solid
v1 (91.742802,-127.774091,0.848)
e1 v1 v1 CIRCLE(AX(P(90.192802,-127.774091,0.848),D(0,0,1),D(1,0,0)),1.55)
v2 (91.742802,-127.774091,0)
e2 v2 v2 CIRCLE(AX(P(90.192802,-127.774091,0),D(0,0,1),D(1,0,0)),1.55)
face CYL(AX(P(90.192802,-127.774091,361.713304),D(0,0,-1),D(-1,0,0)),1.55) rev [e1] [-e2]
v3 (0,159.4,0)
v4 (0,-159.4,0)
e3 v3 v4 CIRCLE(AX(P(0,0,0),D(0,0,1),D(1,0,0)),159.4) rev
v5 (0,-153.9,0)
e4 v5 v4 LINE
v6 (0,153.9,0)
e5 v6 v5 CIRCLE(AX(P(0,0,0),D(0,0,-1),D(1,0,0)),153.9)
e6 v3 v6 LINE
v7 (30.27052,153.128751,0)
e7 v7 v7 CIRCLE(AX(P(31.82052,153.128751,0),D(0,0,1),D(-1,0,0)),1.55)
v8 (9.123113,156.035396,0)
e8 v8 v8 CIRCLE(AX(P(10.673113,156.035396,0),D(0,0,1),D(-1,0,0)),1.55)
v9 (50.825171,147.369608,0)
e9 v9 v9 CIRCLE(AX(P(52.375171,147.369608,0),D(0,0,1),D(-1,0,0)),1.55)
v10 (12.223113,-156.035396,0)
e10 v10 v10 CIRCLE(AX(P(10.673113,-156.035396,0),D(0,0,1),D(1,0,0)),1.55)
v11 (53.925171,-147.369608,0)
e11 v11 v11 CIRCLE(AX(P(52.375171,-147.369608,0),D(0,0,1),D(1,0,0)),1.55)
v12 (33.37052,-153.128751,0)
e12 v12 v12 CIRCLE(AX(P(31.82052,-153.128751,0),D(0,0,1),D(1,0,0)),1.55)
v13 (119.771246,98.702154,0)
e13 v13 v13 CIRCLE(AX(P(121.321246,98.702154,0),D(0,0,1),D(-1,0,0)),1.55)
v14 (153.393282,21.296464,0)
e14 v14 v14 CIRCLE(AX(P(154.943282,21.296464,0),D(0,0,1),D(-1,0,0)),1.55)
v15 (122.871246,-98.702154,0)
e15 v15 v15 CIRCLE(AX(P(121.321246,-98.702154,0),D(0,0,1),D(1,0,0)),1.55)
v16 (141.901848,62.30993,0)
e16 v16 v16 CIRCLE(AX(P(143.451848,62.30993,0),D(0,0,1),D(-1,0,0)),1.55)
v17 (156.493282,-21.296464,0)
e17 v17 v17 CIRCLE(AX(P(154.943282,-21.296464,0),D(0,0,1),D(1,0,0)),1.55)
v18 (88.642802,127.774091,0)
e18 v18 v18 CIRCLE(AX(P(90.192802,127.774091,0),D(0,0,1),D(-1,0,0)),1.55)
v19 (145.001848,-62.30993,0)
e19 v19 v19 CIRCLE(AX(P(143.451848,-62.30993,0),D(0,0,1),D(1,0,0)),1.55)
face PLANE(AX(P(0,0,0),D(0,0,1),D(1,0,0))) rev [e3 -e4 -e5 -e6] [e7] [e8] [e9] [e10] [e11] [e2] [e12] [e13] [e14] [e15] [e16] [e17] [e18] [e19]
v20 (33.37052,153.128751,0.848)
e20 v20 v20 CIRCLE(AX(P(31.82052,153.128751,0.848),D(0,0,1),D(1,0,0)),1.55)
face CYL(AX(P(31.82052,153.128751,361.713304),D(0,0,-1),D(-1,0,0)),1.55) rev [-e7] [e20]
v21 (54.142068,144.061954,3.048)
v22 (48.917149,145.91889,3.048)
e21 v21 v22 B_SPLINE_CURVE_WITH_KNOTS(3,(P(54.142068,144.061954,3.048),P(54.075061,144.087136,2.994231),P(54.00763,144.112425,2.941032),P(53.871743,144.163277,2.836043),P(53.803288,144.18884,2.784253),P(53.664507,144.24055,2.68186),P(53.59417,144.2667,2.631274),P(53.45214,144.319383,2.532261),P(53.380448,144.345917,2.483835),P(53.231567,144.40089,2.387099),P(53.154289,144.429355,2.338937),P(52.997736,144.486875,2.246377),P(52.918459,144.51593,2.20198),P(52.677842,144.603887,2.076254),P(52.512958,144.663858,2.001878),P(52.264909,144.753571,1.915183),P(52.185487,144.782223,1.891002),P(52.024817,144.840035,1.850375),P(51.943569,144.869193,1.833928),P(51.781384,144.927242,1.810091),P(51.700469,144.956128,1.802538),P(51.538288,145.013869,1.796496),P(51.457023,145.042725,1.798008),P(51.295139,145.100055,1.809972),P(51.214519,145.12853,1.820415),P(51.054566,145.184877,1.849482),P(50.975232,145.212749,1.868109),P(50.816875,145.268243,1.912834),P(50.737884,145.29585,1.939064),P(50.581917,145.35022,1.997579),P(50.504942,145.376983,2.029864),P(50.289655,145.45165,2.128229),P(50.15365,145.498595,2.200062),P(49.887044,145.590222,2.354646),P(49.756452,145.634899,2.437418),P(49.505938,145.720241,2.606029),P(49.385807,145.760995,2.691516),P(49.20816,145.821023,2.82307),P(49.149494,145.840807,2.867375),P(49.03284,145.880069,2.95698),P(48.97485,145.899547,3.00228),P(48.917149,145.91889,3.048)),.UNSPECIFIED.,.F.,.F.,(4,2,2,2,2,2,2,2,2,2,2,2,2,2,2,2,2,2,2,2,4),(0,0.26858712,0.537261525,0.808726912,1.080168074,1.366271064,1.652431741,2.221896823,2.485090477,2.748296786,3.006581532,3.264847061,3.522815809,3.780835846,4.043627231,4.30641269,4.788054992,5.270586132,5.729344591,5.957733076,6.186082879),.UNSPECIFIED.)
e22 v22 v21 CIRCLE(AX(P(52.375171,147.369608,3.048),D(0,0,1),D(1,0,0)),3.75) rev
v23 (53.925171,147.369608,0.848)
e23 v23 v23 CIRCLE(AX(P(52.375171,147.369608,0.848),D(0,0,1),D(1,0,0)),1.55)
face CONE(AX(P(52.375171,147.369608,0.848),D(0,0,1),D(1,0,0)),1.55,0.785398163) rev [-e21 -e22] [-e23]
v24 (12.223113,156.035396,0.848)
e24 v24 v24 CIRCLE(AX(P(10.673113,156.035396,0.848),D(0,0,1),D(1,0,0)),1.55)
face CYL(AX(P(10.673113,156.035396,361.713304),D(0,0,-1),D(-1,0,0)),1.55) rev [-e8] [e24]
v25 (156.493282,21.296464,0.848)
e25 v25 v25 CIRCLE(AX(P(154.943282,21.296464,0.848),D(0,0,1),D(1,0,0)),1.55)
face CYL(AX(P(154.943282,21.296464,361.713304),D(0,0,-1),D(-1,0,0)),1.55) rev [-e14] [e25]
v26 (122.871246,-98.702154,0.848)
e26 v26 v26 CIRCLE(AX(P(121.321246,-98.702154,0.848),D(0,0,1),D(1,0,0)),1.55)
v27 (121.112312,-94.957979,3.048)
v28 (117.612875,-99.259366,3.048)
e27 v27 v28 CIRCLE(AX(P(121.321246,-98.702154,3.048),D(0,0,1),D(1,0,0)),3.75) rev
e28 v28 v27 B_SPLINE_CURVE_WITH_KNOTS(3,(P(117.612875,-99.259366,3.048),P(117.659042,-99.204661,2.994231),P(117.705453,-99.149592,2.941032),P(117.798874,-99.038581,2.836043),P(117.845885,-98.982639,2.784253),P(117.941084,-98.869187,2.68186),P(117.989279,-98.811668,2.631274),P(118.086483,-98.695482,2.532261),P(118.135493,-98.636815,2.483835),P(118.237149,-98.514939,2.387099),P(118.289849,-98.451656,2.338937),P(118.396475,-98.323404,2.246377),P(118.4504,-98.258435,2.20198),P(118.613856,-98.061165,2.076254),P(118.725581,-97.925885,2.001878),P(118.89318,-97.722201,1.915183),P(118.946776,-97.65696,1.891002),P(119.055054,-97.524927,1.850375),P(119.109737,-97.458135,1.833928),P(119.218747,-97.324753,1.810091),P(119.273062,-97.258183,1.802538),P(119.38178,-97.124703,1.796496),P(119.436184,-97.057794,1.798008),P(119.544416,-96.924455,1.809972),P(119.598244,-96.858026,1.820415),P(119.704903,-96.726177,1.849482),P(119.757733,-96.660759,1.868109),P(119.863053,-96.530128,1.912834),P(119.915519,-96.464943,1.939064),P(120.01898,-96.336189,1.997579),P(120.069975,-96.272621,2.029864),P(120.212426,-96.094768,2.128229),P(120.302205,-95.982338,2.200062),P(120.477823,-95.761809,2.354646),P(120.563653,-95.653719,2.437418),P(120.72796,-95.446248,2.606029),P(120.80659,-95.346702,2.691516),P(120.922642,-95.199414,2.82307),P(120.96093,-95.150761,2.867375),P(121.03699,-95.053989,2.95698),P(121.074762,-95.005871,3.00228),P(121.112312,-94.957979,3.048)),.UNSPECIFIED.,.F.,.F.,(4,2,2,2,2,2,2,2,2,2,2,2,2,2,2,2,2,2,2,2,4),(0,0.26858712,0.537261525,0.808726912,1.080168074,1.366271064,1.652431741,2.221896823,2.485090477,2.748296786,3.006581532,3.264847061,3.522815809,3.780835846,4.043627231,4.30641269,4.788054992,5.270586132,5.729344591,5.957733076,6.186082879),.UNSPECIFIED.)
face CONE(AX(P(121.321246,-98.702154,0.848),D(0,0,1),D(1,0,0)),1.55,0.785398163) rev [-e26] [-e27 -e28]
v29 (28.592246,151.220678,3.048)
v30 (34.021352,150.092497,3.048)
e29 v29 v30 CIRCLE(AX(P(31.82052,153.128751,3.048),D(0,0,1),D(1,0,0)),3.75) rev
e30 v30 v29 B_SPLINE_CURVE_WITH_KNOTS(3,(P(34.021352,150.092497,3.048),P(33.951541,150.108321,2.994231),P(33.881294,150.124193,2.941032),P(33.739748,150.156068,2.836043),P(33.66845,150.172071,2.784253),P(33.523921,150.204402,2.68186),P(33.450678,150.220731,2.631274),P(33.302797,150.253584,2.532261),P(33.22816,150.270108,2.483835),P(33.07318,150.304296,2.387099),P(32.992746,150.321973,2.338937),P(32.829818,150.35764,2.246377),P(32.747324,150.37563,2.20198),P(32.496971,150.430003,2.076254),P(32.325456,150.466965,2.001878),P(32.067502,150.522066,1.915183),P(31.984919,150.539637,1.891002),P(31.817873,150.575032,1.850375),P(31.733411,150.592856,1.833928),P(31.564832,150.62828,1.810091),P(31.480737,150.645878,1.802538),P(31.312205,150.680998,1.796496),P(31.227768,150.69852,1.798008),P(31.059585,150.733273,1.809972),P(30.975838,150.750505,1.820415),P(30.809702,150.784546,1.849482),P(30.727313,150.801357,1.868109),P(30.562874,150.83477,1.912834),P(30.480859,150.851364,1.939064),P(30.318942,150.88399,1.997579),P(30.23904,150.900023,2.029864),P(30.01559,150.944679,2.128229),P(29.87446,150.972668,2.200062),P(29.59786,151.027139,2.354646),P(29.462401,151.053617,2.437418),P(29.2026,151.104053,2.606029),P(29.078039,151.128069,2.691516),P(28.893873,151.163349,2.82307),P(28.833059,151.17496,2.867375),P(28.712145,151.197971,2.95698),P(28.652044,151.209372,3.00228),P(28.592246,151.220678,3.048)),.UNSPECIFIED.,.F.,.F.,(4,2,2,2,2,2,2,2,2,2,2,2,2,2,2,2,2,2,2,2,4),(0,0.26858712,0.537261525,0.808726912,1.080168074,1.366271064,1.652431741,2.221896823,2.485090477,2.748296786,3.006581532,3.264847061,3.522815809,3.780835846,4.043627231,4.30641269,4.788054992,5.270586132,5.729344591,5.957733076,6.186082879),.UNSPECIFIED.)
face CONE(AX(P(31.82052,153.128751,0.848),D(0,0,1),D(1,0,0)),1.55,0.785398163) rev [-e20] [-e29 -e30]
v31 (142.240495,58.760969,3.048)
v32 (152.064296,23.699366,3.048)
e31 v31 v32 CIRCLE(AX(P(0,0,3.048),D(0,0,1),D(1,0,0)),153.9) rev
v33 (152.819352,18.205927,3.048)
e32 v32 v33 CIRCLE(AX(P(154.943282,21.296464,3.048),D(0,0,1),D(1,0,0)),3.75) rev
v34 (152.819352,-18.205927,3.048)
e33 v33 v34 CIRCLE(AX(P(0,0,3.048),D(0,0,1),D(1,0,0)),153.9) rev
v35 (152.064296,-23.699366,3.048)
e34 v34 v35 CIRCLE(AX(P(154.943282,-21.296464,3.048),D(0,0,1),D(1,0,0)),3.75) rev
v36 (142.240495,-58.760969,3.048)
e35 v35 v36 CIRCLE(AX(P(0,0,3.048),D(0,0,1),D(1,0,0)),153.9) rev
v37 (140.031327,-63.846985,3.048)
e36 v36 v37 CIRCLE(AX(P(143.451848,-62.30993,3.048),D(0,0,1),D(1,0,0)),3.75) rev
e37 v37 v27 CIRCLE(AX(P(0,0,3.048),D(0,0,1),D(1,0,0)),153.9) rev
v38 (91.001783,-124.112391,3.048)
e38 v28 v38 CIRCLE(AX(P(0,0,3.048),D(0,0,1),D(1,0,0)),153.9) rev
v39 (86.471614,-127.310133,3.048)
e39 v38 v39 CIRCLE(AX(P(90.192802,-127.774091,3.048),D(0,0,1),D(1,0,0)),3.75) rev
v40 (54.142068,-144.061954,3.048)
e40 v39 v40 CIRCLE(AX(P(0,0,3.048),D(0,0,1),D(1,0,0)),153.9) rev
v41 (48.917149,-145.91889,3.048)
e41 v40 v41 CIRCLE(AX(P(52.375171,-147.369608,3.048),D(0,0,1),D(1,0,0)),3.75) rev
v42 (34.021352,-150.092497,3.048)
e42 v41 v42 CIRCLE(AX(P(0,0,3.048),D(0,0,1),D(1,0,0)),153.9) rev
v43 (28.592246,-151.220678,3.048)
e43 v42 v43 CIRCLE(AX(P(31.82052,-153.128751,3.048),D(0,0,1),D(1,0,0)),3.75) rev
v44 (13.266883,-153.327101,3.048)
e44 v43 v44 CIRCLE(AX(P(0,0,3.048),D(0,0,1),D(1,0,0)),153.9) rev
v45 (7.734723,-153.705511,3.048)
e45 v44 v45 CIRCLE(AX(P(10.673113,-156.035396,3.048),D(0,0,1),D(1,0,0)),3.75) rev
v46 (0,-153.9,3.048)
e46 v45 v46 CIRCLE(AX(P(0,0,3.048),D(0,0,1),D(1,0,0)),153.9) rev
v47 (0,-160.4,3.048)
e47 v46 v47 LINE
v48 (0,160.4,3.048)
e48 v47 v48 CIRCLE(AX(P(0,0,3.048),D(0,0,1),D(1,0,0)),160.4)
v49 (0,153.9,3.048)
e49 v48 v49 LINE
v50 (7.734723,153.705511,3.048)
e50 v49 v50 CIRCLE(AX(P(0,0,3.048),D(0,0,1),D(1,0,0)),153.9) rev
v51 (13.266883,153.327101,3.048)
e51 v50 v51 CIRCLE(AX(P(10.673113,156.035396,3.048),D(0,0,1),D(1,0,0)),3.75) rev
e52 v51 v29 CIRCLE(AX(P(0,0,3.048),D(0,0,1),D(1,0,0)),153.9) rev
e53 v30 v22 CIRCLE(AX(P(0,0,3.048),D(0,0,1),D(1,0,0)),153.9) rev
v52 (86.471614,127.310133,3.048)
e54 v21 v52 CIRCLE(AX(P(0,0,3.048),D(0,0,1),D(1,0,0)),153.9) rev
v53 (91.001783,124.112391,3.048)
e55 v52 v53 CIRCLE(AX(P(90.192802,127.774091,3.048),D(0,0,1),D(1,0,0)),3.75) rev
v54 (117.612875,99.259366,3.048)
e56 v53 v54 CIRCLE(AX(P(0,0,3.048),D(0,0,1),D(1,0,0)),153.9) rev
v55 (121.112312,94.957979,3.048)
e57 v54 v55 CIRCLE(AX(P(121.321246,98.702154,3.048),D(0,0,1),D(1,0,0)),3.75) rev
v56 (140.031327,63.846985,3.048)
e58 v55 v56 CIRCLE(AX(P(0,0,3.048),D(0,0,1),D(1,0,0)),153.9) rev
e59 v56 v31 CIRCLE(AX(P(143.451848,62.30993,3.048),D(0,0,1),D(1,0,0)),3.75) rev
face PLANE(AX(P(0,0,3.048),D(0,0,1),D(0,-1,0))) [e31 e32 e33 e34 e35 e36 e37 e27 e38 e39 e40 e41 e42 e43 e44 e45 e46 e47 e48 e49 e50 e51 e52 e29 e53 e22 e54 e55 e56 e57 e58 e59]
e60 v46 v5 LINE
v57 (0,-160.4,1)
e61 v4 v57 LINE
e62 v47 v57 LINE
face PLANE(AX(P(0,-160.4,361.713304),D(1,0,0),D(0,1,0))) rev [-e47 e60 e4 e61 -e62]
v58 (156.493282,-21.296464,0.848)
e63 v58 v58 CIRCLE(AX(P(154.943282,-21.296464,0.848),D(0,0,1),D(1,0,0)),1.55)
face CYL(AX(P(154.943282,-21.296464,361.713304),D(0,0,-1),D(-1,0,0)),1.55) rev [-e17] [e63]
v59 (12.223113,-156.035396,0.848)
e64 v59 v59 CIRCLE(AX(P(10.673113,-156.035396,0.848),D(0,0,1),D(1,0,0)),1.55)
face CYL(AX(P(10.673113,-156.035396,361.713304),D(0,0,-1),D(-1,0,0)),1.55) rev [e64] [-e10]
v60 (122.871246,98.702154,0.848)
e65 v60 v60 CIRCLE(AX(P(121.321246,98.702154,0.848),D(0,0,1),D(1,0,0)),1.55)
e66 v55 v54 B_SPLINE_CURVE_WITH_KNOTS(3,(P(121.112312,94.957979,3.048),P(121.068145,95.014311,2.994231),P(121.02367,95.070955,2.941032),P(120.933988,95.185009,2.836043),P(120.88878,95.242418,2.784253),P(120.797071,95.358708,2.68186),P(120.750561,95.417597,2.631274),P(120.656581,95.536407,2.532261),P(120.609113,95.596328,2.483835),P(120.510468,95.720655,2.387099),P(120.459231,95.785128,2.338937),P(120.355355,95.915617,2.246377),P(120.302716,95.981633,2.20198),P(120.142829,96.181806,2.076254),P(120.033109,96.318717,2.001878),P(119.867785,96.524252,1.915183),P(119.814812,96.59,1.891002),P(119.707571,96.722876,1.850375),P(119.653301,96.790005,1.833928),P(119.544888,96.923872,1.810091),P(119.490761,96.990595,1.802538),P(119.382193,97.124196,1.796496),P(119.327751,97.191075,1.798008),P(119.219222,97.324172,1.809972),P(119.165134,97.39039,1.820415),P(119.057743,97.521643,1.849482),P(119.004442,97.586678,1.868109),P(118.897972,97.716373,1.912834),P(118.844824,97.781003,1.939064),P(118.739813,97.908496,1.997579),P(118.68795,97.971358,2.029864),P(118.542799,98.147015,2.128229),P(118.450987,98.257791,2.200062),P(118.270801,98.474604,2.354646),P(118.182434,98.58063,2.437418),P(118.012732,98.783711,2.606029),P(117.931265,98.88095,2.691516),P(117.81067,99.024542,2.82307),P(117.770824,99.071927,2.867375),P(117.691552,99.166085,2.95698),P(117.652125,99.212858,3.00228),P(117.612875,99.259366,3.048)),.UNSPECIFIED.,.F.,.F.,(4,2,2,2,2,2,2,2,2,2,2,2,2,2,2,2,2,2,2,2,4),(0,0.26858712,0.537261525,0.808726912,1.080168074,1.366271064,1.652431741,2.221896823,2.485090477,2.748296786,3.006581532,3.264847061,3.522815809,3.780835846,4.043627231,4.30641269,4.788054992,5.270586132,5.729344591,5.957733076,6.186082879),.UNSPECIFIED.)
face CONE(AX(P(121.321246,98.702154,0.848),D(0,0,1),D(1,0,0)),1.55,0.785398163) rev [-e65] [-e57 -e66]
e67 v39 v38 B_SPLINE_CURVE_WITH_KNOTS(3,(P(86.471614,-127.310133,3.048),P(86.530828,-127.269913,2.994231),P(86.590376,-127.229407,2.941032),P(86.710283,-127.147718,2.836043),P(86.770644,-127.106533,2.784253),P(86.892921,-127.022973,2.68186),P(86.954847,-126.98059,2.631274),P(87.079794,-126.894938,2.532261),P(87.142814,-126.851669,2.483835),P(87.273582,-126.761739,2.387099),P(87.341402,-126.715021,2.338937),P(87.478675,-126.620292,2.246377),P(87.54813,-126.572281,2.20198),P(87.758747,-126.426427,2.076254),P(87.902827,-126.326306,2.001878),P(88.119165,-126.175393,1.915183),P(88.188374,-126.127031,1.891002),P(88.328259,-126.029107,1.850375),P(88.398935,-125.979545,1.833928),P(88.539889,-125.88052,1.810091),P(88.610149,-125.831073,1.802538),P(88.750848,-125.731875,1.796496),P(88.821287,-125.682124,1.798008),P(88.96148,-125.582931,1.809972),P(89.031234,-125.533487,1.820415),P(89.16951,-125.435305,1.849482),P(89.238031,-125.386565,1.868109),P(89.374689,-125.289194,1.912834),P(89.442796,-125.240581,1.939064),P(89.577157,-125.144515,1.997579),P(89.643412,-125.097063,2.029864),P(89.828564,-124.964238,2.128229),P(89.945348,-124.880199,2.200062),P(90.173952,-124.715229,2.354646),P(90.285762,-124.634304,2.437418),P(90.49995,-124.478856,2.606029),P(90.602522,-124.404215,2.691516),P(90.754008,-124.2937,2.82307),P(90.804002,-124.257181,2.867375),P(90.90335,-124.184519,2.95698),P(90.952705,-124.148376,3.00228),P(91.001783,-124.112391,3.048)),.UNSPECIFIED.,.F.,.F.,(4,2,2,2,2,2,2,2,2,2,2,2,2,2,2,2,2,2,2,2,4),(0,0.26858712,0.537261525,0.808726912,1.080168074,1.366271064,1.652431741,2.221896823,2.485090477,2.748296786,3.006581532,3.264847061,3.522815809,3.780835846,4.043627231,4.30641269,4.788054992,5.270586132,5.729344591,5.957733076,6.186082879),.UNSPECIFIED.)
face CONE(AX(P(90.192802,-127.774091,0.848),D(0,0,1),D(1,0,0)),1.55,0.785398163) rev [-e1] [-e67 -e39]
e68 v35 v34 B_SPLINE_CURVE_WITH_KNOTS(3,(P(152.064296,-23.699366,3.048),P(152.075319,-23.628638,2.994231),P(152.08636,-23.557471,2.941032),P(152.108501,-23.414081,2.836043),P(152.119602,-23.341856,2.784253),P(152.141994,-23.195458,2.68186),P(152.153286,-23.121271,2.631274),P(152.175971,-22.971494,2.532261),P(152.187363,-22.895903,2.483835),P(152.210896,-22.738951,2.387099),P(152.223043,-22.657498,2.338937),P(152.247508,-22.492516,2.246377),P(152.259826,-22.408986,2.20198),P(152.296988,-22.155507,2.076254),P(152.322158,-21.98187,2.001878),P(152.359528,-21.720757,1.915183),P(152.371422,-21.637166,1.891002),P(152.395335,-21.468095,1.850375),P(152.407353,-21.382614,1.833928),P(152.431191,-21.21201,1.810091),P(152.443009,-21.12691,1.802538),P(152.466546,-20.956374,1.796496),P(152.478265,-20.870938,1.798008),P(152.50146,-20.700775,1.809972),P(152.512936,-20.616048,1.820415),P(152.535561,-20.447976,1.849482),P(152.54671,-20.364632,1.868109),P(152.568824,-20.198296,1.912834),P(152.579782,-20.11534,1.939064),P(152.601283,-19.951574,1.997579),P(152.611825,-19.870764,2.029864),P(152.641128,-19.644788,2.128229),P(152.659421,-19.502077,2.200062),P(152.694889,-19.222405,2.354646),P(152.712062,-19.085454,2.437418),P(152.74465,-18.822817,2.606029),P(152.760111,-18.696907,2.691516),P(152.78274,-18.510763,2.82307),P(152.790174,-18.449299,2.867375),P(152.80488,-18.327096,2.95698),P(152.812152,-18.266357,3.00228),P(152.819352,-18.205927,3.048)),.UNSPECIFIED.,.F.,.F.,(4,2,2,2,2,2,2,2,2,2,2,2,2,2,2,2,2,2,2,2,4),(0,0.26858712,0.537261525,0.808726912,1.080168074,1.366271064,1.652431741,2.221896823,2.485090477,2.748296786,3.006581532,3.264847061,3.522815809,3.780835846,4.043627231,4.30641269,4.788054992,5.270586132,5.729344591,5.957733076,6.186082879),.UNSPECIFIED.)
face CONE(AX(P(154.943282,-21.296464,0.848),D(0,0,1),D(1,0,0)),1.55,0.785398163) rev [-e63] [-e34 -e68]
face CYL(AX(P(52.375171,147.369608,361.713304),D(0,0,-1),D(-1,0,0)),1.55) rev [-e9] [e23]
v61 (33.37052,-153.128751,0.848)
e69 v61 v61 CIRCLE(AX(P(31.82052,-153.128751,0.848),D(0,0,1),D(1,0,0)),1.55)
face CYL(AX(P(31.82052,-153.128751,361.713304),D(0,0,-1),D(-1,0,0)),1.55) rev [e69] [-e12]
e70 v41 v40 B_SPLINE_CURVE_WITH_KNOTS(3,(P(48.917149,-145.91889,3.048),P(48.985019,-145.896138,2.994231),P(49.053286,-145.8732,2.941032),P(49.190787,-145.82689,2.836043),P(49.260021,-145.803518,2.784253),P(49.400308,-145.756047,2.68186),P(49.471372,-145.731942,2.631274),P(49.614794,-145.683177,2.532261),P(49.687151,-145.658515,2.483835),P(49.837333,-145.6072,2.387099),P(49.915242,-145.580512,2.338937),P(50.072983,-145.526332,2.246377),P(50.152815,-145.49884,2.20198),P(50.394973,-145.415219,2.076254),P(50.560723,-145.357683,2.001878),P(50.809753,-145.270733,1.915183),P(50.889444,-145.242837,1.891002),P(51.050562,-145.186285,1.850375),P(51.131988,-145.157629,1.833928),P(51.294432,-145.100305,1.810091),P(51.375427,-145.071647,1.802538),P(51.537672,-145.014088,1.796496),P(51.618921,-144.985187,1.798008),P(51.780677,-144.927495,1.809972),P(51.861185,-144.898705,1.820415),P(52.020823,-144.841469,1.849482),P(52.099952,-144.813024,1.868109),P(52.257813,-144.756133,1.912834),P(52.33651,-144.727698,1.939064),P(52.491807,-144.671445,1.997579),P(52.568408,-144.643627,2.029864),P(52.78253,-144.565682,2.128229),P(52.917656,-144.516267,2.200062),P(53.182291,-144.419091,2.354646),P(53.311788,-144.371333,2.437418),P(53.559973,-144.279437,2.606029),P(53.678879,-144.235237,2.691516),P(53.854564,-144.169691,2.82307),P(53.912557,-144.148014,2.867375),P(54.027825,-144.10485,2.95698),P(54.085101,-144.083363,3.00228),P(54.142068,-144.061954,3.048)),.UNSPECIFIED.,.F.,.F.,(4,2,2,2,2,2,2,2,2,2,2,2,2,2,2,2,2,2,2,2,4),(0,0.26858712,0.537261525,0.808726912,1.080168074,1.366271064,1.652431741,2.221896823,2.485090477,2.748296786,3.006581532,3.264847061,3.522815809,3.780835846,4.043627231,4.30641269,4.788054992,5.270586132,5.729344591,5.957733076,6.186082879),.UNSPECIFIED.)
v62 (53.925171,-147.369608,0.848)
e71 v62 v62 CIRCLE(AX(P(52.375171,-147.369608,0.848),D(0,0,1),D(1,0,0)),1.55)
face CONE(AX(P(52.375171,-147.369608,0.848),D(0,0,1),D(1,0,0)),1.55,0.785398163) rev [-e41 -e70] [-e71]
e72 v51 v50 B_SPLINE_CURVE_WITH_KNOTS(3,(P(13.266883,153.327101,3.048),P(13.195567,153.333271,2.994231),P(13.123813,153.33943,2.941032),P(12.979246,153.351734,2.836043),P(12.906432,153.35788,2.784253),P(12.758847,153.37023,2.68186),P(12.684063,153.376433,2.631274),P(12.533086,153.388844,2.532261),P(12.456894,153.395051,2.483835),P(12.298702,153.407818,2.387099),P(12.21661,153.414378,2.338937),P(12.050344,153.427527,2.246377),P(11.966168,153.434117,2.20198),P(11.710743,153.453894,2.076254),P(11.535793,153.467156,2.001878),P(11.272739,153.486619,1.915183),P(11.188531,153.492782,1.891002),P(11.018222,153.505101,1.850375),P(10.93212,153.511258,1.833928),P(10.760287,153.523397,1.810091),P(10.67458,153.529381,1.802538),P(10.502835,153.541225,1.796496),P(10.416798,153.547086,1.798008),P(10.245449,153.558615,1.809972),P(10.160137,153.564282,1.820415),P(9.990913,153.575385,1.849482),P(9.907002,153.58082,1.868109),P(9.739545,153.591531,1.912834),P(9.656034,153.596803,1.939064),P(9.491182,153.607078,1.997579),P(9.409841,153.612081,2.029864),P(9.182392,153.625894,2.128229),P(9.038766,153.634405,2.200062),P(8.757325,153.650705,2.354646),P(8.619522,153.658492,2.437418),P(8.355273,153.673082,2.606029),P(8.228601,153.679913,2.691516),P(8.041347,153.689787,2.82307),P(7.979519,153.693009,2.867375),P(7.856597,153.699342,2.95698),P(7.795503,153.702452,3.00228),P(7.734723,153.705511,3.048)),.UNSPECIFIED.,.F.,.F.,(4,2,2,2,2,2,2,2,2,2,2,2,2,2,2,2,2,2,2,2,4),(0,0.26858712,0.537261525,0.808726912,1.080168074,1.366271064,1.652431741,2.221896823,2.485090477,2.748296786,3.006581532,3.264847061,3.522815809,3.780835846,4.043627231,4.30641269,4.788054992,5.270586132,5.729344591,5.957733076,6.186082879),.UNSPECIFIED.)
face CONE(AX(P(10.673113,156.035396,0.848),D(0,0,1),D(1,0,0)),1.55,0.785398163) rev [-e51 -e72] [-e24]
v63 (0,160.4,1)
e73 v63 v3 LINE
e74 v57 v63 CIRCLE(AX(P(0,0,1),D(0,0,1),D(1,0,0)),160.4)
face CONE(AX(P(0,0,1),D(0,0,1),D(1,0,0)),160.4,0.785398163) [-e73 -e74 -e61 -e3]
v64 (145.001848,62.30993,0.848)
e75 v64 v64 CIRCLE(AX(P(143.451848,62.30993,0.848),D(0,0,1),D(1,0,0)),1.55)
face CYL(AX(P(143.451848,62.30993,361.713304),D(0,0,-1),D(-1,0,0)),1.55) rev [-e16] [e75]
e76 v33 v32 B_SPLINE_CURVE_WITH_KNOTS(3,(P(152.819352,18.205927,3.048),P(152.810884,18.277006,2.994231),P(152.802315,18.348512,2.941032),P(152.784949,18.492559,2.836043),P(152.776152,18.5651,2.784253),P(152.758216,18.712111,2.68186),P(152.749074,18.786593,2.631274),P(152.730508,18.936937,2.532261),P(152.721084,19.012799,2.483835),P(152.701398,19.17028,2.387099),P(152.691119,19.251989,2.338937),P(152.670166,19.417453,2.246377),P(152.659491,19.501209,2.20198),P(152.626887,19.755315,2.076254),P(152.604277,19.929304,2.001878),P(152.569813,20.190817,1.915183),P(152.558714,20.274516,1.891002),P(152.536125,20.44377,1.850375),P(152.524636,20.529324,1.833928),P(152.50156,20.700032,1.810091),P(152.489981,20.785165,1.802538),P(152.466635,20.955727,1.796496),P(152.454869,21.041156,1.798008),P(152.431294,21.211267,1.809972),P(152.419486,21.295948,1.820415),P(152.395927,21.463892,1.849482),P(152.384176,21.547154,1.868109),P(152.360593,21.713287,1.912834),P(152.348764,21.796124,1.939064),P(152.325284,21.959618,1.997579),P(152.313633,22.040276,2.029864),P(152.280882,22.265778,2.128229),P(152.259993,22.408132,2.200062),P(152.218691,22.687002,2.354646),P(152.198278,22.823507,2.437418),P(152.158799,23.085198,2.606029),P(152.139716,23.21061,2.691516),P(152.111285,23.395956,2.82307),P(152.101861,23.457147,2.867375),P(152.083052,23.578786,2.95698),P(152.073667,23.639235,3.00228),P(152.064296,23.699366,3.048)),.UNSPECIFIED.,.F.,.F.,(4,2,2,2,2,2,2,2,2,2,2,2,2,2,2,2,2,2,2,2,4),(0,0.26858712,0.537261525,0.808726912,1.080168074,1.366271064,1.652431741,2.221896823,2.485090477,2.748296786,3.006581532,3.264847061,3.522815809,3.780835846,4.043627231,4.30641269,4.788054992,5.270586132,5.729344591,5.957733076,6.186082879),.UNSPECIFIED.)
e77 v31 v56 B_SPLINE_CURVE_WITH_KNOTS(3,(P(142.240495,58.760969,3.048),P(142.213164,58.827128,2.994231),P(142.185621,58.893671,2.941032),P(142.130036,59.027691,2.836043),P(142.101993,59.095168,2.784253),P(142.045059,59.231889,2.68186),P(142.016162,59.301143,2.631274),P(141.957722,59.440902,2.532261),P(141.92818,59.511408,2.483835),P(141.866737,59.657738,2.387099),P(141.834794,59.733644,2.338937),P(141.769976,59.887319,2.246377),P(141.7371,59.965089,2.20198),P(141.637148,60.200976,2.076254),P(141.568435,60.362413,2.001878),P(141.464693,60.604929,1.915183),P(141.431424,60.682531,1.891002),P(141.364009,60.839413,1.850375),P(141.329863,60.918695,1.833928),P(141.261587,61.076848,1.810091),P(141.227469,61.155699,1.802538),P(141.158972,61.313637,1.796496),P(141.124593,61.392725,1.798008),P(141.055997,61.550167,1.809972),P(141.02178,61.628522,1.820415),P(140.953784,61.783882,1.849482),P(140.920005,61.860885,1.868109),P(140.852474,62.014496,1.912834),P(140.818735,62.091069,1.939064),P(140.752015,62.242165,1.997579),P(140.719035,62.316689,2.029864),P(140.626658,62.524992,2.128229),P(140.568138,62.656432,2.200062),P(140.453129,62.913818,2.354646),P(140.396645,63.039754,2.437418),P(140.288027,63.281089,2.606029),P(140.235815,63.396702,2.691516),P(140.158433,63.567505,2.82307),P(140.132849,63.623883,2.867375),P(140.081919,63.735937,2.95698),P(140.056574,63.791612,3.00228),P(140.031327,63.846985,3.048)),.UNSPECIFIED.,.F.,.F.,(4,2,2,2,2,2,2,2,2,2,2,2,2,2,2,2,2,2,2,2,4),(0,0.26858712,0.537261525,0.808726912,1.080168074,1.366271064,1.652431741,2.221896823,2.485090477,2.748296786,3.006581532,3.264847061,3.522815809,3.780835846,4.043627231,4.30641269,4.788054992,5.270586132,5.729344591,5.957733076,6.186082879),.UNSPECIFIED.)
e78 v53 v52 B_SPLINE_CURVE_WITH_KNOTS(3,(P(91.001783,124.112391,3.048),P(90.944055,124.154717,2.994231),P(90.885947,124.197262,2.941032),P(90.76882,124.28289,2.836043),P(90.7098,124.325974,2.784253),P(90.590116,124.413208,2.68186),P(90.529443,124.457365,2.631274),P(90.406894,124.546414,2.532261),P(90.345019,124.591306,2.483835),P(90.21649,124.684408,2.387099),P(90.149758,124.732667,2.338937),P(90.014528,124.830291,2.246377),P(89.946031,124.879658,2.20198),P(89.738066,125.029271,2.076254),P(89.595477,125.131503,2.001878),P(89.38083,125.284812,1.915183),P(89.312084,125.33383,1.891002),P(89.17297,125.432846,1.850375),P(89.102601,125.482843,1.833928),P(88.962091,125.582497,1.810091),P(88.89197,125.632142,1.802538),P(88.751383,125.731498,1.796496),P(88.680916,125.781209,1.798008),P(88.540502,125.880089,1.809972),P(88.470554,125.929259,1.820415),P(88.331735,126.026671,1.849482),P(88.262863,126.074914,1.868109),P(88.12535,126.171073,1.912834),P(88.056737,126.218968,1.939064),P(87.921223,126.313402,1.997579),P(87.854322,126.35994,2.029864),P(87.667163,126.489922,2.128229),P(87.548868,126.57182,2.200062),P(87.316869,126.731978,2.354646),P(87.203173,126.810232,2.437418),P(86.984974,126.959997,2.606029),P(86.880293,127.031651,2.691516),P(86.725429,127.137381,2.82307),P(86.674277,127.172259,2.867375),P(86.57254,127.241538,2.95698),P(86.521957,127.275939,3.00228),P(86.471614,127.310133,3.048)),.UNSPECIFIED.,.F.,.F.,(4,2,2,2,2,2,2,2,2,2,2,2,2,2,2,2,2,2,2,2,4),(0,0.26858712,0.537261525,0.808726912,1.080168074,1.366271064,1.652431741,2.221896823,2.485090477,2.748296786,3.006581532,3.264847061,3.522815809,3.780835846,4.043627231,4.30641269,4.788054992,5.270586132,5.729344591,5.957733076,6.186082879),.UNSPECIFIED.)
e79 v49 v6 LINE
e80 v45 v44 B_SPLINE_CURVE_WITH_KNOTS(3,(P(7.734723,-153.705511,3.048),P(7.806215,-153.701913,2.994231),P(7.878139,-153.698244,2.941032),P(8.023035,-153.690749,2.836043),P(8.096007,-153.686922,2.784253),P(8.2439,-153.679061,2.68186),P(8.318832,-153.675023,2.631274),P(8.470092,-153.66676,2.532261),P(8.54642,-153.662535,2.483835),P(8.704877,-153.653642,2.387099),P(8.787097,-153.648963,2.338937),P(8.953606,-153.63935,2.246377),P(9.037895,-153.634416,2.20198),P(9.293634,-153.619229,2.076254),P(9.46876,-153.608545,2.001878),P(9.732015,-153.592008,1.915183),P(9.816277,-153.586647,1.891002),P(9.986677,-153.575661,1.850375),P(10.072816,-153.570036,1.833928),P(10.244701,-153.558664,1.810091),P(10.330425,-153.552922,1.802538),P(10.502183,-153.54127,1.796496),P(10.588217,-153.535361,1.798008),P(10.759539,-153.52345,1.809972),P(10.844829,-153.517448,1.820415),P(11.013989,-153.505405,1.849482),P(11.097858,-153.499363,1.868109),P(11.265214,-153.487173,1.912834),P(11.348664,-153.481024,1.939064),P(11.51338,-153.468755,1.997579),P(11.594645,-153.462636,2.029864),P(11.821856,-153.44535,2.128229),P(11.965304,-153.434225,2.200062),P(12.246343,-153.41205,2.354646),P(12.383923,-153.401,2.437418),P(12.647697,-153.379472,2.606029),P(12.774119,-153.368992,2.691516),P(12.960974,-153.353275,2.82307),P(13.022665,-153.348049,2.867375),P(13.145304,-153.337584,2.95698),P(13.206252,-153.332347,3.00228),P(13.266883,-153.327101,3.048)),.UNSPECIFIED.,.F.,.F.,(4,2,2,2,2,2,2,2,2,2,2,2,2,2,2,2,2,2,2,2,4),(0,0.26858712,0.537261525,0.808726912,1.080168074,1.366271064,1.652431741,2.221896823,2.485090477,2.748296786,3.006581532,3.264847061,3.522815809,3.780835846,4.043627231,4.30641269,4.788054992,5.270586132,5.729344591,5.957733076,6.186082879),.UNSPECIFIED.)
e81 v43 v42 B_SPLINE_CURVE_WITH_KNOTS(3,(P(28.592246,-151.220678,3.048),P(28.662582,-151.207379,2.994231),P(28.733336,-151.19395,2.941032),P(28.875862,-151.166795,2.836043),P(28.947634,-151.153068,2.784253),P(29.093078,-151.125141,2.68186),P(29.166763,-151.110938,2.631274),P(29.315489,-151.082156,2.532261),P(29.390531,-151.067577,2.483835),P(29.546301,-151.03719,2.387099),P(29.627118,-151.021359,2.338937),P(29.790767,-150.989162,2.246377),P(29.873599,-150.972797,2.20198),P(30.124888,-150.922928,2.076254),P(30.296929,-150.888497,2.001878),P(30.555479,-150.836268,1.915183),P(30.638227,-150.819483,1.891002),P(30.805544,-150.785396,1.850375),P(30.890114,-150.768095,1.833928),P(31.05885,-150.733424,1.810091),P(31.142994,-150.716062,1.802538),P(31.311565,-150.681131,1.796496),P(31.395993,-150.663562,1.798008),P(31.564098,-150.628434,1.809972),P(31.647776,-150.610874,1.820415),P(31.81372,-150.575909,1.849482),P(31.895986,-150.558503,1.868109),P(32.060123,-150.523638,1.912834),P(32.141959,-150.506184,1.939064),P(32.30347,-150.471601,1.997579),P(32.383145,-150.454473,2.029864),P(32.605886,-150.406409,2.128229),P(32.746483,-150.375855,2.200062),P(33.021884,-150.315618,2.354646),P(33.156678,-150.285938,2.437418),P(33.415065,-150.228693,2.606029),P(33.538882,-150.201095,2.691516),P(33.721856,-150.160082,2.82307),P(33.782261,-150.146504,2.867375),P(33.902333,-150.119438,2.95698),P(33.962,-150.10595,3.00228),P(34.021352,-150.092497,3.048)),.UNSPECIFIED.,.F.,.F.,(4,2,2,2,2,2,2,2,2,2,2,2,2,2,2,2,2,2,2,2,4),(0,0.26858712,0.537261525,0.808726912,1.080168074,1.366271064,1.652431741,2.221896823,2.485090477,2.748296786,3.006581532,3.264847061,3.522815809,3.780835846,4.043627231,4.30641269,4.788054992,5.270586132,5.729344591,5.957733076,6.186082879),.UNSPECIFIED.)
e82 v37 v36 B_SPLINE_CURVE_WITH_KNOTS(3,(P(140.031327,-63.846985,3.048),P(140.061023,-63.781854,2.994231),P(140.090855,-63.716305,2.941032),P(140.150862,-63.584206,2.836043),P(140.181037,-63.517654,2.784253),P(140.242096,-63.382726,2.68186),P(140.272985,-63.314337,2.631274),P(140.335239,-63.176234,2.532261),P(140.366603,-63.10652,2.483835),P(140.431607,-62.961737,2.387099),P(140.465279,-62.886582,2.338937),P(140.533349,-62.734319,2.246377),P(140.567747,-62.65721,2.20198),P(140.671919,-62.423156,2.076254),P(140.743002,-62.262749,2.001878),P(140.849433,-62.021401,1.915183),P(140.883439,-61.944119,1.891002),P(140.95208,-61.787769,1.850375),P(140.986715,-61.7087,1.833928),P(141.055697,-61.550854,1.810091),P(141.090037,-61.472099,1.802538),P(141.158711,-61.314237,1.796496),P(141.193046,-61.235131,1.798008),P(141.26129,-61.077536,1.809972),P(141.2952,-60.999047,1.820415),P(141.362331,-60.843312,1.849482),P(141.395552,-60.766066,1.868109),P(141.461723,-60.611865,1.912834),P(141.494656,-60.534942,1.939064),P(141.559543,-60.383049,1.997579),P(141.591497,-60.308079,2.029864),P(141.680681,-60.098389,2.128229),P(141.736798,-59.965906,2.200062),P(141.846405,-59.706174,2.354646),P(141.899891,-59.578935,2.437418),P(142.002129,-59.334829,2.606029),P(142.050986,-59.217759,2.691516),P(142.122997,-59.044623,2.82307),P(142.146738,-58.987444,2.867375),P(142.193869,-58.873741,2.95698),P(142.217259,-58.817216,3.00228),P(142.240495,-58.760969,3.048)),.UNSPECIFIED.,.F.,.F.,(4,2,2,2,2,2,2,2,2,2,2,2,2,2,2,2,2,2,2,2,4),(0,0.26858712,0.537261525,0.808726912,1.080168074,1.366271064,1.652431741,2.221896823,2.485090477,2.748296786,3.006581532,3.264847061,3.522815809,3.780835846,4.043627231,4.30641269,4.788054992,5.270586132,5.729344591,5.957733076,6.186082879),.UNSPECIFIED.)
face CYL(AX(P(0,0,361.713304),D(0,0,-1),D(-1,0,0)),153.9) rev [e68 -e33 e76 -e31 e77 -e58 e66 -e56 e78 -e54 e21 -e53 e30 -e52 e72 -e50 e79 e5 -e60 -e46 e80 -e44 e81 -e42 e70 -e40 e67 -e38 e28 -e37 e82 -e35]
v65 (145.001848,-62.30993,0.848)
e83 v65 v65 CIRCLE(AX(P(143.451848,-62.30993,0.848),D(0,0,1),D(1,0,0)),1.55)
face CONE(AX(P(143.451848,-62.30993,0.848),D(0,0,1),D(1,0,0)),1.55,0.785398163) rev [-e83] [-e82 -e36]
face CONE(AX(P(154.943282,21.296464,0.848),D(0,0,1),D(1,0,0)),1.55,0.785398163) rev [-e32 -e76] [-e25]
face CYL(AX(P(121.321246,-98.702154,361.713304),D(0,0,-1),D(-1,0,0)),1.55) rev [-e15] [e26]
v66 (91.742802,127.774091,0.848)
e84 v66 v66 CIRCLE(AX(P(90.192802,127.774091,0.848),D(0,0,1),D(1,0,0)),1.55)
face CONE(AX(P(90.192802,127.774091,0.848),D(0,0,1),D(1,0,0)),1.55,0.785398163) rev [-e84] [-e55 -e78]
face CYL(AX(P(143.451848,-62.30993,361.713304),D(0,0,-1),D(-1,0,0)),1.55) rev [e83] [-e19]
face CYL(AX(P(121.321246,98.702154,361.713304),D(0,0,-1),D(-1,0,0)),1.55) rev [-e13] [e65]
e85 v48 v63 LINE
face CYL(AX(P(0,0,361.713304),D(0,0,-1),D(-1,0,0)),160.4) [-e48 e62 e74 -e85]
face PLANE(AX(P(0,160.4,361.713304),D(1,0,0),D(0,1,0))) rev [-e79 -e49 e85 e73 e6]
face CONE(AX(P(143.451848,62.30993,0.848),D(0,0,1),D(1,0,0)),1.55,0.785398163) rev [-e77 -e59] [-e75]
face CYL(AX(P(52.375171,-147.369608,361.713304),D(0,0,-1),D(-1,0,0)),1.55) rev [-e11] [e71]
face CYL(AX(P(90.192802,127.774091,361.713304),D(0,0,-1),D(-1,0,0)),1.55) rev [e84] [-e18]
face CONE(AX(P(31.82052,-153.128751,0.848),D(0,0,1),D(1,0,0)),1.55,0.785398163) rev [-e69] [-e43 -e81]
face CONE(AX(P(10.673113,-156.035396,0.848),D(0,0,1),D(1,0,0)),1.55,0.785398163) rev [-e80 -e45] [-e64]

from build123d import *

# Parameters (mm, degrees)
SKETCH1_R           = 1.55
BOSS_EXTRUDE1_DEPTH = 3.048
CHAMFER2_SIZE       = 1


with BuildPart() as part:
    # Sketch1 → Boss-Extrude1 (new body)
    with BuildSketch(Plane.XY):
        with BuildLine():
            Line((0, -160.4), (0, -153.9))
            ThreePointArc((0, -153.9), (153.9, 0), (0, 153.9))
            Line((0, 153.9), (0, 160.4))
            ThreePointArc((0, 160.4), (160.4, 0), (0, -160.4))
        make_face()
        with Locations((10.67311345, -156.035395501)):
            Circle(SKETCH1_R, mode=Mode.SUBTRACT)
        with Locations((31.820520441, -153.128751314)):
            Circle(SKETCH1_R, mode=Mode.SUBTRACT)
        with Locations((52.375171344, -147.369608219)):
            Circle(SKETCH1_R, mode=Mode.SUBTRACT)
        with Locations((90.192802379, -127.774091267)):
            Circle(SKETCH1_R, mode=Mode.SUBTRACT)
        with Locations((121.321245866, -98.702154493)):
            Circle(SKETCH1_R, mode=Mode.SUBTRACT)
        with Locations((143.451847555, -62.309930452)):
            Circle(SKETCH1_R, mode=Mode.SUBTRACT)
        with Locations((154.94328196, -21.296463919)):
            Circle(SKETCH1_R, mode=Mode.SUBTRACT)
        with Locations(Location((10.67311345, 156.035395501, 0), (0, 0, 180))):
            Circle(SKETCH1_R, mode=Mode.SUBTRACT)
        with Locations(Location((154.94328196, 21.296463919, 0), (0, 0, 180))):
            Circle(SKETCH1_R, mode=Mode.SUBTRACT)
        with Locations(Location((143.451847555, 62.309930452, 0), (0, 0, 180))):
            Circle(SKETCH1_R, mode=Mode.SUBTRACT)
        with Locations(Location((121.321245866, 98.702154493, 0), (0, 0, 180))):
            Circle(SKETCH1_R, mode=Mode.SUBTRACT)
        with Locations(Location((90.192802379, 127.774091267, 0), (0, 0, 180))):
            Circle(SKETCH1_R, mode=Mode.SUBTRACT)
        with Locations(Location((52.375171344, 147.369608219, 0), (0, 0, 180))):
            Circle(SKETCH1_R, mode=Mode.SUBTRACT)
        with Locations(Location((31.820520441, 153.128751314, 0), (0, 0, 180))):
            Circle(SKETCH1_R, mode=Mode.SUBTRACT)
    extrude(amount=BOSS_EXTRUDE1_DEPTH)

    # Chamfer1: read off the stored shape, not the designer's step
    # Chamfer1: loft between two sections, ruled curve by curve
    chamfer1_from = [
        Edge.make_three_point_arc((91.742802379, -127.774091267, 0.848), (90.192802379, -126.224091267, 0.848), (88.642802379, -127.774091267, 0.848)),
        Edge.make_three_point_arc((88.642802379, -127.774091267, 0.848), (90.192802379, -129.324091267, 0.848), (91.742802379, -127.774091267, 0.848)),
    ]
    chamfer1_to = [
        Edge.make_three_point_arc((93.942802379, -127.774091267, 3.048), (90.192802379, -124.024091267, 3.048), (86.442802379, -127.774091267, 3.048)),
        Edge.make_three_point_arc((86.442802379, -127.774091267, 3.048), (90.192802379, -131.524091267, 3.048), (93.942802379, -127.774091267, 3.048)),
    ]
    chamfer1 = Solid(Shell([*[Face.make_surface_from_curves(chamfer1_from[k], chamfer1_to[k]) for k in range(2)], Face(Wire(chamfer1_from)), Face(Wire(chamfer1_to))]))
    add(chamfer1, mode=Mode.SUBTRACT)

    # Chamfer1 2: loft between two sections, ruled curve by curve
    chamfer1_2_from = [
        Edge.make_three_point_arc((12.22311345, -156.035395501, 0.848), (10.67311345, -154.485395501, 0.848), (9.12311345, -156.035395501, 0.848)),
        Edge.make_three_point_arc((9.12311345, -156.035395501, 0.848), (10.67311345, -157.585395501, 0.848), (12.22311345, -156.035395501, 0.848)),
    ]
    chamfer1_2_to = [
        Edge.make_three_point_arc((14.42311345, -156.035395501, 3.048), (10.67311345, -152.285395501, 3.048), (6.92311345, -156.035395501, 3.048)),
        Edge.make_three_point_arc((6.92311345, -156.035395501, 3.048), (10.67311345, -159.785395501, 3.048), (14.42311345, -156.035395501, 3.048)),
    ]
    chamfer1_2 = Solid(Shell([*[Face.make_surface_from_curves(chamfer1_2_from[k], chamfer1_2_to[k]) for k in range(2)], Face(Wire(chamfer1_2_from)), Face(Wire(chamfer1_2_to))]))
    add(chamfer1_2, mode=Mode.SUBTRACT)

    # Chamfer1 3: loft between two sections, ruled curve by curve
    chamfer1_3_from = [
        Edge.make_three_point_arc((33.370520441, -153.128751314, 0.848), (31.820520441, -151.578751314, 0.848), (30.270520441, -153.128751314, 0.848)),
        Edge.make_three_point_arc((30.270520441, -153.128751314, 0.848), (31.820520441, -154.678751314, 0.848), (33.370520441, -153.128751314, 0.848)),
    ]
    chamfer1_3_to = [
        Edge.make_three_point_arc((35.570520441, -153.128751314, 3.048), (31.820520441, -149.378751314, 3.048), (28.070520441, -153.128751314, 3.048)),
        Edge.make_three_point_arc((28.070520441, -153.128751314, 3.048), (31.820520441, -156.878751314, 3.048), (35.570520441, -153.128751314, 3.048)),
    ]
    chamfer1_3 = Solid(Shell([*[Face.make_surface_from_curves(chamfer1_3_from[k], chamfer1_3_to[k]) for k in range(2)], Face(Wire(chamfer1_3_from)), Face(Wire(chamfer1_3_to))]))
    add(chamfer1_3, mode=Mode.SUBTRACT)

    # Chamfer1 4: loft between two sections, ruled curve by curve
    chamfer1_4_from = [
        Edge.make_three_point_arc((53.925171344, -147.369608219, 0.848), (52.375171344, -145.819608219, 0.848), (50.825171344, -147.369608219, 0.848)),
        Edge.make_three_point_arc((50.825171344, -147.369608219, 0.848), (52.375171344, -148.919608219, 0.848), (53.925171344, -147.369608219, 0.848)),
    ]
    chamfer1_4_to = [
        Edge.make_three_point_arc((56.125171344, -147.369608219, 3.048), (52.375171344, -143.619608219, 3.048), (48.625171344, -147.369608219, 3.048)),
        Edge.make_three_point_arc((48.625171344, -147.369608219, 3.048), (52.375171344, -151.119608219, 3.048), (56.125171344, -147.369608219, 3.048)),
    ]
    chamfer1_4 = Solid(Shell([*[Face.make_surface_from_curves(chamfer1_4_from[k], chamfer1_4_to[k]) for k in range(2)], Face(Wire(chamfer1_4_from)), Face(Wire(chamfer1_4_to))]))
    add(chamfer1_4, mode=Mode.SUBTRACT)

    # Chamfer1 5: loft between two sections, ruled curve by curve
    chamfer1_5_from = [
        Edge.make_three_point_arc((122.871245866, -98.702154493, 0.848), (121.321245866, -97.152154493, 0.848), (119.771245866, -98.702154493, 0.848)),
        Edge.make_three_point_arc((119.771245866, -98.702154493, 0.848), (121.321245866, -100.252154493, 0.848), (122.871245866, -98.702154493, 0.848)),
    ]
    chamfer1_5_to = [
        Edge.make_three_point_arc((125.071245866, -98.702154493, 3.048), (121.321245866, -94.952154493, 3.048), (117.571245866, -98.702154493, 3.048)),
        Edge.make_three_point_arc((117.571245866, -98.702154493, 3.048), (121.321245866, -102.452154493, 3.048), (125.071245866, -98.702154493, 3.048)),
    ]
    chamfer1_5 = Solid(Shell([*[Face.make_surface_from_curves(chamfer1_5_from[k], chamfer1_5_to[k]) for k in range(2)], Face(Wire(chamfer1_5_from)), Face(Wire(chamfer1_5_to))]))
    add(chamfer1_5, mode=Mode.SUBTRACT)

    # Chamfer1 6: loft between two sections, ruled curve by curve
    chamfer1_6_from = [
        Edge.make_three_point_arc((145.001847555, -62.309930452, 0.848), (143.451847555, -60.759930452, 0.848), (141.901847555, -62.309930452, 0.848)),
        Edge.make_three_point_arc((141.901847555, -62.309930452, 0.848), (143.451847555, -63.859930452, 0.848), (145.001847555, -62.309930452, 0.848)),
    ]
    chamfer1_6_to = [
        Edge.make_three_point_arc((147.201847555, -62.309930452, 3.048), (143.451847555, -58.559930452, 3.048), (139.701847555, -62.309930452, 3.048)),
        Edge.make_three_point_arc((139.701847555, -62.309930452, 3.048), (143.451847555, -66.059930452, 3.048), (147.201847555, -62.309930452, 3.048)),
    ]
    chamfer1_6 = Solid(Shell([*[Face.make_surface_from_curves(chamfer1_6_from[k], chamfer1_6_to[k]) for k in range(2)], Face(Wire(chamfer1_6_from)), Face(Wire(chamfer1_6_to))]))
    add(chamfer1_6, mode=Mode.SUBTRACT)

    # Chamfer1 7: loft between two sections, ruled curve by curve
    chamfer1_7_from = [
        Edge.make_three_point_arc((156.49328196, -21.296463919, 0.848), (154.94328196, -19.746463919, 0.848), (153.39328196, -21.296463919, 0.848)),
        Edge.make_three_point_arc((153.39328196, -21.296463919, 0.848), (154.94328196, -22.846463919, 0.848), (156.49328196, -21.296463919, 0.848)),
    ]
    chamfer1_7_to = [
        Edge.make_three_point_arc((158.69328196, -21.296463919, 3.048), (154.94328196, -17.546463919, 3.048), (151.19328196, -21.296463919, 3.048)),
        Edge.make_three_point_arc((151.19328196, -21.296463919, 3.048), (154.94328196, -25.046463919, 3.048), (158.69328196, -21.296463919, 3.048)),
    ]
    chamfer1_7 = Solid(Shell([*[Face.make_surface_from_curves(chamfer1_7_from[k], chamfer1_7_to[k]) for k in range(2)], Face(Wire(chamfer1_7_from)), Face(Wire(chamfer1_7_to))]))
    add(chamfer1_7, mode=Mode.SUBTRACT)

    # Chamfer1 8: loft between two sections, ruled curve by curve
    chamfer1_8_from = [
        Edge.make_three_point_arc((156.49328196, 21.296463919, 0.848), (154.94328196, 22.846463919, 0.848), (153.39328196, 21.296463919, 0.848)),
        Edge.make_three_point_arc((153.39328196, 21.296463919, 0.848), (154.94328196, 19.746463919, 0.848), (156.49328196, 21.296463919, 0.848)),
    ]
    chamfer1_8_to = [
        Edge.make_three_point_arc((158.69328196, 21.296463919, 3.048), (154.94328196, 25.046463919, 3.048), (151.19328196, 21.296463919, 3.048)),
        Edge.make_three_point_arc((151.19328196, 21.296463919, 3.048), (154.94328196, 17.546463919, 3.048), (158.69328196, 21.296463919, 3.048)),
    ]
    chamfer1_8 = Solid(Shell([*[Face.make_surface_from_curves(chamfer1_8_from[k], chamfer1_8_to[k]) for k in range(2)], Face(Wire(chamfer1_8_from)), Face(Wire(chamfer1_8_to))]))
    add(chamfer1_8, mode=Mode.SUBTRACT)

    # Chamfer1 9: loft between two sections, ruled curve by curve
    chamfer1_9_from = [
        Edge.make_three_point_arc((145.001847555, 62.309930452, 0.848), (143.451847555, 63.859930452, 0.848), (141.901847555, 62.309930452, 0.848)),
        Edge.make_three_point_arc((141.901847555, 62.309930452, 0.848), (143.451847555, 60.759930452, 0.848), (145.001847555, 62.309930452, 0.848)),
    ]
    chamfer1_9_to = [
        Edge.make_three_point_arc((147.201847555, 62.309930452, 3.048), (143.451847555, 66.059930452, 3.048), (139.701847555, 62.309930452, 3.048)),
        Edge.make_three_point_arc((139.701847555, 62.309930452, 3.048), (143.451847555, 58.559930452, 3.048), (147.201847555, 62.309930452, 3.048)),
    ]
    chamfer1_9 = Solid(Shell([*[Face.make_surface_from_curves(chamfer1_9_from[k], chamfer1_9_to[k]) for k in range(2)], Face(Wire(chamfer1_9_from)), Face(Wire(chamfer1_9_to))]))
    add(chamfer1_9, mode=Mode.SUBTRACT)

    # Chamfer1 10: loft between two sections, ruled curve by curve
    chamfer1_10_from = [
        Edge.make_three_point_arc((122.871245866, 98.702154493, 0.848), (121.321245866, 100.252154493, 0.848), (119.771245866, 98.702154493, 0.848)),
        Edge.make_three_point_arc((119.771245866, 98.702154493, 0.848), (121.321245866, 97.152154493, 0.848), (122.871245866, 98.702154493, 0.848)),
    ]
    chamfer1_10_to = [
        Edge.make_three_point_arc((125.071245866, 98.702154493, 3.048), (121.321245866, 102.452154493, 3.048), (117.571245866, 98.702154493, 3.048)),
        Edge.make_three_point_arc((117.571245866, 98.702154493, 3.048), (121.321245866, 94.952154493, 3.048), (125.071245866, 98.702154493, 3.048)),
    ]
    chamfer1_10 = Solid(Shell([*[Face.make_surface_from_curves(chamfer1_10_from[k], chamfer1_10_to[k]) for k in range(2)], Face(Wire(chamfer1_10_from)), Face(Wire(chamfer1_10_to))]))
    add(chamfer1_10, mode=Mode.SUBTRACT)

    # Chamfer1 11: loft between two sections, ruled curve by curve
    chamfer1_11_from = [
        Edge.make_three_point_arc((91.742802379, 127.774091267, 0.848), (90.192802379, 129.324091267, 0.848), (88.642802379, 127.774091267, 0.848)),
        Edge.make_three_point_arc((88.642802379, 127.774091267, 0.848), (90.192802379, 126.224091267, 0.848), (91.742802379, 127.774091267, 0.848)),
    ]
    chamfer1_11_to = [
        Edge.make_three_point_arc((93.942802379, 127.774091267, 3.048), (90.192802379, 131.524091267, 3.048), (86.442802379, 127.774091267, 3.048)),
        Edge.make_three_point_arc((86.442802379, 127.774091267, 3.048), (90.192802379, 124.024091267, 3.048), (93.942802379, 127.774091267, 3.048)),
    ]
    chamfer1_11 = Solid(Shell([*[Face.make_surface_from_curves(chamfer1_11_from[k], chamfer1_11_to[k]) for k in range(2)], Face(Wire(chamfer1_11_from)), Face(Wire(chamfer1_11_to))]))
    add(chamfer1_11, mode=Mode.SUBTRACT)

    # Chamfer1 12: loft between two sections, ruled curve by curve
    chamfer1_12_from = [
        Edge.make_three_point_arc((53.925171344, 147.369608219, 0.848), (52.375171344, 148.919608219, 0.848), (50.825171344, 147.369608219, 0.848)),
        Edge.make_three_point_arc((50.825171344, 147.369608219, 0.848), (52.375171344, 145.819608219, 0.848), (53.925171344, 147.369608219, 0.848)),
    ]
    chamfer1_12_to = [
        Edge.make_three_point_arc((56.125171344, 147.369608219, 3.048), (52.375171344, 151.119608219, 3.048), (48.625171344, 147.369608219, 3.048)),
        Edge.make_three_point_arc((48.625171344, 147.369608219, 3.048), (52.375171344, 143.619608219, 3.048), (56.125171344, 147.369608219, 3.048)),
    ]
    chamfer1_12 = Solid(Shell([*[Face.make_surface_from_curves(chamfer1_12_from[k], chamfer1_12_to[k]) for k in range(2)], Face(Wire(chamfer1_12_from)), Face(Wire(chamfer1_12_to))]))
    add(chamfer1_12, mode=Mode.SUBTRACT)

    # Chamfer1 13: loft between two sections, ruled curve by curve
    chamfer1_13_from = [
        Edge.make_three_point_arc((33.370520441, 153.128751314, 0.848), (31.820520441, 154.678751314, 0.848), (30.270520441, 153.128751314, 0.848)),
        Edge.make_three_point_arc((30.270520441, 153.128751314, 0.848), (31.820520441, 151.578751314, 0.848), (33.370520441, 153.128751314, 0.848)),
    ]
    chamfer1_13_to = [
        Edge.make_three_point_arc((35.570520441, 153.128751314, 3.048), (31.820520441, 156.878751314, 3.048), (28.070520441, 153.128751314, 3.048)),
        Edge.make_three_point_arc((28.070520441, 153.128751314, 3.048), (31.820520441, 149.378751314, 3.048), (35.570520441, 153.128751314, 3.048)),
    ]
    chamfer1_13 = Solid(Shell([*[Face.make_surface_from_curves(chamfer1_13_from[k], chamfer1_13_to[k]) for k in range(2)], Face(Wire(chamfer1_13_from)), Face(Wire(chamfer1_13_to))]))
    add(chamfer1_13, mode=Mode.SUBTRACT)

    # Chamfer1 14: loft between two sections, ruled curve by curve
    chamfer1_14_from = [
        Edge.make_three_point_arc((12.22311345, 156.035395501, 0.848), (10.67311345, 157.585395501, 0.848), (9.12311345, 156.035395501, 0.848)),
        Edge.make_three_point_arc((9.12311345, 156.035395501, 0.848), (10.67311345, 154.485395501, 0.848), (12.22311345, 156.035395501, 0.848)),
    ]
    chamfer1_14_to = [
        Edge.make_three_point_arc((14.42311345, 156.035395501, 3.048), (10.67311345, 159.785395501, 3.048), (6.92311345, 156.035395501, 3.048)),
        Edge.make_three_point_arc((6.92311345, 156.035395501, 3.048), (10.67311345, 152.285395501, 3.048), (14.42311345, 156.035395501, 3.048)),
    ]
    chamfer1_14 = Solid(Shell([*[Face.make_surface_from_curves(chamfer1_14_from[k], chamfer1_14_to[k]) for k in range(2)], Face(Wire(chamfer1_14_from)), Face(Wire(chamfer1_14_to))]))
    add(chamfer1_14, mode=Mode.SUBTRACT)

    # Chamfer2
    chamfer2_edges = [part.edges().sort_by_distance(p)[0] for p in [
        (160.4, 0, 0),
    ]]
    chamfer(chamfer2_edges, length=CHAMFER2_SIZE)


solid = part.part
